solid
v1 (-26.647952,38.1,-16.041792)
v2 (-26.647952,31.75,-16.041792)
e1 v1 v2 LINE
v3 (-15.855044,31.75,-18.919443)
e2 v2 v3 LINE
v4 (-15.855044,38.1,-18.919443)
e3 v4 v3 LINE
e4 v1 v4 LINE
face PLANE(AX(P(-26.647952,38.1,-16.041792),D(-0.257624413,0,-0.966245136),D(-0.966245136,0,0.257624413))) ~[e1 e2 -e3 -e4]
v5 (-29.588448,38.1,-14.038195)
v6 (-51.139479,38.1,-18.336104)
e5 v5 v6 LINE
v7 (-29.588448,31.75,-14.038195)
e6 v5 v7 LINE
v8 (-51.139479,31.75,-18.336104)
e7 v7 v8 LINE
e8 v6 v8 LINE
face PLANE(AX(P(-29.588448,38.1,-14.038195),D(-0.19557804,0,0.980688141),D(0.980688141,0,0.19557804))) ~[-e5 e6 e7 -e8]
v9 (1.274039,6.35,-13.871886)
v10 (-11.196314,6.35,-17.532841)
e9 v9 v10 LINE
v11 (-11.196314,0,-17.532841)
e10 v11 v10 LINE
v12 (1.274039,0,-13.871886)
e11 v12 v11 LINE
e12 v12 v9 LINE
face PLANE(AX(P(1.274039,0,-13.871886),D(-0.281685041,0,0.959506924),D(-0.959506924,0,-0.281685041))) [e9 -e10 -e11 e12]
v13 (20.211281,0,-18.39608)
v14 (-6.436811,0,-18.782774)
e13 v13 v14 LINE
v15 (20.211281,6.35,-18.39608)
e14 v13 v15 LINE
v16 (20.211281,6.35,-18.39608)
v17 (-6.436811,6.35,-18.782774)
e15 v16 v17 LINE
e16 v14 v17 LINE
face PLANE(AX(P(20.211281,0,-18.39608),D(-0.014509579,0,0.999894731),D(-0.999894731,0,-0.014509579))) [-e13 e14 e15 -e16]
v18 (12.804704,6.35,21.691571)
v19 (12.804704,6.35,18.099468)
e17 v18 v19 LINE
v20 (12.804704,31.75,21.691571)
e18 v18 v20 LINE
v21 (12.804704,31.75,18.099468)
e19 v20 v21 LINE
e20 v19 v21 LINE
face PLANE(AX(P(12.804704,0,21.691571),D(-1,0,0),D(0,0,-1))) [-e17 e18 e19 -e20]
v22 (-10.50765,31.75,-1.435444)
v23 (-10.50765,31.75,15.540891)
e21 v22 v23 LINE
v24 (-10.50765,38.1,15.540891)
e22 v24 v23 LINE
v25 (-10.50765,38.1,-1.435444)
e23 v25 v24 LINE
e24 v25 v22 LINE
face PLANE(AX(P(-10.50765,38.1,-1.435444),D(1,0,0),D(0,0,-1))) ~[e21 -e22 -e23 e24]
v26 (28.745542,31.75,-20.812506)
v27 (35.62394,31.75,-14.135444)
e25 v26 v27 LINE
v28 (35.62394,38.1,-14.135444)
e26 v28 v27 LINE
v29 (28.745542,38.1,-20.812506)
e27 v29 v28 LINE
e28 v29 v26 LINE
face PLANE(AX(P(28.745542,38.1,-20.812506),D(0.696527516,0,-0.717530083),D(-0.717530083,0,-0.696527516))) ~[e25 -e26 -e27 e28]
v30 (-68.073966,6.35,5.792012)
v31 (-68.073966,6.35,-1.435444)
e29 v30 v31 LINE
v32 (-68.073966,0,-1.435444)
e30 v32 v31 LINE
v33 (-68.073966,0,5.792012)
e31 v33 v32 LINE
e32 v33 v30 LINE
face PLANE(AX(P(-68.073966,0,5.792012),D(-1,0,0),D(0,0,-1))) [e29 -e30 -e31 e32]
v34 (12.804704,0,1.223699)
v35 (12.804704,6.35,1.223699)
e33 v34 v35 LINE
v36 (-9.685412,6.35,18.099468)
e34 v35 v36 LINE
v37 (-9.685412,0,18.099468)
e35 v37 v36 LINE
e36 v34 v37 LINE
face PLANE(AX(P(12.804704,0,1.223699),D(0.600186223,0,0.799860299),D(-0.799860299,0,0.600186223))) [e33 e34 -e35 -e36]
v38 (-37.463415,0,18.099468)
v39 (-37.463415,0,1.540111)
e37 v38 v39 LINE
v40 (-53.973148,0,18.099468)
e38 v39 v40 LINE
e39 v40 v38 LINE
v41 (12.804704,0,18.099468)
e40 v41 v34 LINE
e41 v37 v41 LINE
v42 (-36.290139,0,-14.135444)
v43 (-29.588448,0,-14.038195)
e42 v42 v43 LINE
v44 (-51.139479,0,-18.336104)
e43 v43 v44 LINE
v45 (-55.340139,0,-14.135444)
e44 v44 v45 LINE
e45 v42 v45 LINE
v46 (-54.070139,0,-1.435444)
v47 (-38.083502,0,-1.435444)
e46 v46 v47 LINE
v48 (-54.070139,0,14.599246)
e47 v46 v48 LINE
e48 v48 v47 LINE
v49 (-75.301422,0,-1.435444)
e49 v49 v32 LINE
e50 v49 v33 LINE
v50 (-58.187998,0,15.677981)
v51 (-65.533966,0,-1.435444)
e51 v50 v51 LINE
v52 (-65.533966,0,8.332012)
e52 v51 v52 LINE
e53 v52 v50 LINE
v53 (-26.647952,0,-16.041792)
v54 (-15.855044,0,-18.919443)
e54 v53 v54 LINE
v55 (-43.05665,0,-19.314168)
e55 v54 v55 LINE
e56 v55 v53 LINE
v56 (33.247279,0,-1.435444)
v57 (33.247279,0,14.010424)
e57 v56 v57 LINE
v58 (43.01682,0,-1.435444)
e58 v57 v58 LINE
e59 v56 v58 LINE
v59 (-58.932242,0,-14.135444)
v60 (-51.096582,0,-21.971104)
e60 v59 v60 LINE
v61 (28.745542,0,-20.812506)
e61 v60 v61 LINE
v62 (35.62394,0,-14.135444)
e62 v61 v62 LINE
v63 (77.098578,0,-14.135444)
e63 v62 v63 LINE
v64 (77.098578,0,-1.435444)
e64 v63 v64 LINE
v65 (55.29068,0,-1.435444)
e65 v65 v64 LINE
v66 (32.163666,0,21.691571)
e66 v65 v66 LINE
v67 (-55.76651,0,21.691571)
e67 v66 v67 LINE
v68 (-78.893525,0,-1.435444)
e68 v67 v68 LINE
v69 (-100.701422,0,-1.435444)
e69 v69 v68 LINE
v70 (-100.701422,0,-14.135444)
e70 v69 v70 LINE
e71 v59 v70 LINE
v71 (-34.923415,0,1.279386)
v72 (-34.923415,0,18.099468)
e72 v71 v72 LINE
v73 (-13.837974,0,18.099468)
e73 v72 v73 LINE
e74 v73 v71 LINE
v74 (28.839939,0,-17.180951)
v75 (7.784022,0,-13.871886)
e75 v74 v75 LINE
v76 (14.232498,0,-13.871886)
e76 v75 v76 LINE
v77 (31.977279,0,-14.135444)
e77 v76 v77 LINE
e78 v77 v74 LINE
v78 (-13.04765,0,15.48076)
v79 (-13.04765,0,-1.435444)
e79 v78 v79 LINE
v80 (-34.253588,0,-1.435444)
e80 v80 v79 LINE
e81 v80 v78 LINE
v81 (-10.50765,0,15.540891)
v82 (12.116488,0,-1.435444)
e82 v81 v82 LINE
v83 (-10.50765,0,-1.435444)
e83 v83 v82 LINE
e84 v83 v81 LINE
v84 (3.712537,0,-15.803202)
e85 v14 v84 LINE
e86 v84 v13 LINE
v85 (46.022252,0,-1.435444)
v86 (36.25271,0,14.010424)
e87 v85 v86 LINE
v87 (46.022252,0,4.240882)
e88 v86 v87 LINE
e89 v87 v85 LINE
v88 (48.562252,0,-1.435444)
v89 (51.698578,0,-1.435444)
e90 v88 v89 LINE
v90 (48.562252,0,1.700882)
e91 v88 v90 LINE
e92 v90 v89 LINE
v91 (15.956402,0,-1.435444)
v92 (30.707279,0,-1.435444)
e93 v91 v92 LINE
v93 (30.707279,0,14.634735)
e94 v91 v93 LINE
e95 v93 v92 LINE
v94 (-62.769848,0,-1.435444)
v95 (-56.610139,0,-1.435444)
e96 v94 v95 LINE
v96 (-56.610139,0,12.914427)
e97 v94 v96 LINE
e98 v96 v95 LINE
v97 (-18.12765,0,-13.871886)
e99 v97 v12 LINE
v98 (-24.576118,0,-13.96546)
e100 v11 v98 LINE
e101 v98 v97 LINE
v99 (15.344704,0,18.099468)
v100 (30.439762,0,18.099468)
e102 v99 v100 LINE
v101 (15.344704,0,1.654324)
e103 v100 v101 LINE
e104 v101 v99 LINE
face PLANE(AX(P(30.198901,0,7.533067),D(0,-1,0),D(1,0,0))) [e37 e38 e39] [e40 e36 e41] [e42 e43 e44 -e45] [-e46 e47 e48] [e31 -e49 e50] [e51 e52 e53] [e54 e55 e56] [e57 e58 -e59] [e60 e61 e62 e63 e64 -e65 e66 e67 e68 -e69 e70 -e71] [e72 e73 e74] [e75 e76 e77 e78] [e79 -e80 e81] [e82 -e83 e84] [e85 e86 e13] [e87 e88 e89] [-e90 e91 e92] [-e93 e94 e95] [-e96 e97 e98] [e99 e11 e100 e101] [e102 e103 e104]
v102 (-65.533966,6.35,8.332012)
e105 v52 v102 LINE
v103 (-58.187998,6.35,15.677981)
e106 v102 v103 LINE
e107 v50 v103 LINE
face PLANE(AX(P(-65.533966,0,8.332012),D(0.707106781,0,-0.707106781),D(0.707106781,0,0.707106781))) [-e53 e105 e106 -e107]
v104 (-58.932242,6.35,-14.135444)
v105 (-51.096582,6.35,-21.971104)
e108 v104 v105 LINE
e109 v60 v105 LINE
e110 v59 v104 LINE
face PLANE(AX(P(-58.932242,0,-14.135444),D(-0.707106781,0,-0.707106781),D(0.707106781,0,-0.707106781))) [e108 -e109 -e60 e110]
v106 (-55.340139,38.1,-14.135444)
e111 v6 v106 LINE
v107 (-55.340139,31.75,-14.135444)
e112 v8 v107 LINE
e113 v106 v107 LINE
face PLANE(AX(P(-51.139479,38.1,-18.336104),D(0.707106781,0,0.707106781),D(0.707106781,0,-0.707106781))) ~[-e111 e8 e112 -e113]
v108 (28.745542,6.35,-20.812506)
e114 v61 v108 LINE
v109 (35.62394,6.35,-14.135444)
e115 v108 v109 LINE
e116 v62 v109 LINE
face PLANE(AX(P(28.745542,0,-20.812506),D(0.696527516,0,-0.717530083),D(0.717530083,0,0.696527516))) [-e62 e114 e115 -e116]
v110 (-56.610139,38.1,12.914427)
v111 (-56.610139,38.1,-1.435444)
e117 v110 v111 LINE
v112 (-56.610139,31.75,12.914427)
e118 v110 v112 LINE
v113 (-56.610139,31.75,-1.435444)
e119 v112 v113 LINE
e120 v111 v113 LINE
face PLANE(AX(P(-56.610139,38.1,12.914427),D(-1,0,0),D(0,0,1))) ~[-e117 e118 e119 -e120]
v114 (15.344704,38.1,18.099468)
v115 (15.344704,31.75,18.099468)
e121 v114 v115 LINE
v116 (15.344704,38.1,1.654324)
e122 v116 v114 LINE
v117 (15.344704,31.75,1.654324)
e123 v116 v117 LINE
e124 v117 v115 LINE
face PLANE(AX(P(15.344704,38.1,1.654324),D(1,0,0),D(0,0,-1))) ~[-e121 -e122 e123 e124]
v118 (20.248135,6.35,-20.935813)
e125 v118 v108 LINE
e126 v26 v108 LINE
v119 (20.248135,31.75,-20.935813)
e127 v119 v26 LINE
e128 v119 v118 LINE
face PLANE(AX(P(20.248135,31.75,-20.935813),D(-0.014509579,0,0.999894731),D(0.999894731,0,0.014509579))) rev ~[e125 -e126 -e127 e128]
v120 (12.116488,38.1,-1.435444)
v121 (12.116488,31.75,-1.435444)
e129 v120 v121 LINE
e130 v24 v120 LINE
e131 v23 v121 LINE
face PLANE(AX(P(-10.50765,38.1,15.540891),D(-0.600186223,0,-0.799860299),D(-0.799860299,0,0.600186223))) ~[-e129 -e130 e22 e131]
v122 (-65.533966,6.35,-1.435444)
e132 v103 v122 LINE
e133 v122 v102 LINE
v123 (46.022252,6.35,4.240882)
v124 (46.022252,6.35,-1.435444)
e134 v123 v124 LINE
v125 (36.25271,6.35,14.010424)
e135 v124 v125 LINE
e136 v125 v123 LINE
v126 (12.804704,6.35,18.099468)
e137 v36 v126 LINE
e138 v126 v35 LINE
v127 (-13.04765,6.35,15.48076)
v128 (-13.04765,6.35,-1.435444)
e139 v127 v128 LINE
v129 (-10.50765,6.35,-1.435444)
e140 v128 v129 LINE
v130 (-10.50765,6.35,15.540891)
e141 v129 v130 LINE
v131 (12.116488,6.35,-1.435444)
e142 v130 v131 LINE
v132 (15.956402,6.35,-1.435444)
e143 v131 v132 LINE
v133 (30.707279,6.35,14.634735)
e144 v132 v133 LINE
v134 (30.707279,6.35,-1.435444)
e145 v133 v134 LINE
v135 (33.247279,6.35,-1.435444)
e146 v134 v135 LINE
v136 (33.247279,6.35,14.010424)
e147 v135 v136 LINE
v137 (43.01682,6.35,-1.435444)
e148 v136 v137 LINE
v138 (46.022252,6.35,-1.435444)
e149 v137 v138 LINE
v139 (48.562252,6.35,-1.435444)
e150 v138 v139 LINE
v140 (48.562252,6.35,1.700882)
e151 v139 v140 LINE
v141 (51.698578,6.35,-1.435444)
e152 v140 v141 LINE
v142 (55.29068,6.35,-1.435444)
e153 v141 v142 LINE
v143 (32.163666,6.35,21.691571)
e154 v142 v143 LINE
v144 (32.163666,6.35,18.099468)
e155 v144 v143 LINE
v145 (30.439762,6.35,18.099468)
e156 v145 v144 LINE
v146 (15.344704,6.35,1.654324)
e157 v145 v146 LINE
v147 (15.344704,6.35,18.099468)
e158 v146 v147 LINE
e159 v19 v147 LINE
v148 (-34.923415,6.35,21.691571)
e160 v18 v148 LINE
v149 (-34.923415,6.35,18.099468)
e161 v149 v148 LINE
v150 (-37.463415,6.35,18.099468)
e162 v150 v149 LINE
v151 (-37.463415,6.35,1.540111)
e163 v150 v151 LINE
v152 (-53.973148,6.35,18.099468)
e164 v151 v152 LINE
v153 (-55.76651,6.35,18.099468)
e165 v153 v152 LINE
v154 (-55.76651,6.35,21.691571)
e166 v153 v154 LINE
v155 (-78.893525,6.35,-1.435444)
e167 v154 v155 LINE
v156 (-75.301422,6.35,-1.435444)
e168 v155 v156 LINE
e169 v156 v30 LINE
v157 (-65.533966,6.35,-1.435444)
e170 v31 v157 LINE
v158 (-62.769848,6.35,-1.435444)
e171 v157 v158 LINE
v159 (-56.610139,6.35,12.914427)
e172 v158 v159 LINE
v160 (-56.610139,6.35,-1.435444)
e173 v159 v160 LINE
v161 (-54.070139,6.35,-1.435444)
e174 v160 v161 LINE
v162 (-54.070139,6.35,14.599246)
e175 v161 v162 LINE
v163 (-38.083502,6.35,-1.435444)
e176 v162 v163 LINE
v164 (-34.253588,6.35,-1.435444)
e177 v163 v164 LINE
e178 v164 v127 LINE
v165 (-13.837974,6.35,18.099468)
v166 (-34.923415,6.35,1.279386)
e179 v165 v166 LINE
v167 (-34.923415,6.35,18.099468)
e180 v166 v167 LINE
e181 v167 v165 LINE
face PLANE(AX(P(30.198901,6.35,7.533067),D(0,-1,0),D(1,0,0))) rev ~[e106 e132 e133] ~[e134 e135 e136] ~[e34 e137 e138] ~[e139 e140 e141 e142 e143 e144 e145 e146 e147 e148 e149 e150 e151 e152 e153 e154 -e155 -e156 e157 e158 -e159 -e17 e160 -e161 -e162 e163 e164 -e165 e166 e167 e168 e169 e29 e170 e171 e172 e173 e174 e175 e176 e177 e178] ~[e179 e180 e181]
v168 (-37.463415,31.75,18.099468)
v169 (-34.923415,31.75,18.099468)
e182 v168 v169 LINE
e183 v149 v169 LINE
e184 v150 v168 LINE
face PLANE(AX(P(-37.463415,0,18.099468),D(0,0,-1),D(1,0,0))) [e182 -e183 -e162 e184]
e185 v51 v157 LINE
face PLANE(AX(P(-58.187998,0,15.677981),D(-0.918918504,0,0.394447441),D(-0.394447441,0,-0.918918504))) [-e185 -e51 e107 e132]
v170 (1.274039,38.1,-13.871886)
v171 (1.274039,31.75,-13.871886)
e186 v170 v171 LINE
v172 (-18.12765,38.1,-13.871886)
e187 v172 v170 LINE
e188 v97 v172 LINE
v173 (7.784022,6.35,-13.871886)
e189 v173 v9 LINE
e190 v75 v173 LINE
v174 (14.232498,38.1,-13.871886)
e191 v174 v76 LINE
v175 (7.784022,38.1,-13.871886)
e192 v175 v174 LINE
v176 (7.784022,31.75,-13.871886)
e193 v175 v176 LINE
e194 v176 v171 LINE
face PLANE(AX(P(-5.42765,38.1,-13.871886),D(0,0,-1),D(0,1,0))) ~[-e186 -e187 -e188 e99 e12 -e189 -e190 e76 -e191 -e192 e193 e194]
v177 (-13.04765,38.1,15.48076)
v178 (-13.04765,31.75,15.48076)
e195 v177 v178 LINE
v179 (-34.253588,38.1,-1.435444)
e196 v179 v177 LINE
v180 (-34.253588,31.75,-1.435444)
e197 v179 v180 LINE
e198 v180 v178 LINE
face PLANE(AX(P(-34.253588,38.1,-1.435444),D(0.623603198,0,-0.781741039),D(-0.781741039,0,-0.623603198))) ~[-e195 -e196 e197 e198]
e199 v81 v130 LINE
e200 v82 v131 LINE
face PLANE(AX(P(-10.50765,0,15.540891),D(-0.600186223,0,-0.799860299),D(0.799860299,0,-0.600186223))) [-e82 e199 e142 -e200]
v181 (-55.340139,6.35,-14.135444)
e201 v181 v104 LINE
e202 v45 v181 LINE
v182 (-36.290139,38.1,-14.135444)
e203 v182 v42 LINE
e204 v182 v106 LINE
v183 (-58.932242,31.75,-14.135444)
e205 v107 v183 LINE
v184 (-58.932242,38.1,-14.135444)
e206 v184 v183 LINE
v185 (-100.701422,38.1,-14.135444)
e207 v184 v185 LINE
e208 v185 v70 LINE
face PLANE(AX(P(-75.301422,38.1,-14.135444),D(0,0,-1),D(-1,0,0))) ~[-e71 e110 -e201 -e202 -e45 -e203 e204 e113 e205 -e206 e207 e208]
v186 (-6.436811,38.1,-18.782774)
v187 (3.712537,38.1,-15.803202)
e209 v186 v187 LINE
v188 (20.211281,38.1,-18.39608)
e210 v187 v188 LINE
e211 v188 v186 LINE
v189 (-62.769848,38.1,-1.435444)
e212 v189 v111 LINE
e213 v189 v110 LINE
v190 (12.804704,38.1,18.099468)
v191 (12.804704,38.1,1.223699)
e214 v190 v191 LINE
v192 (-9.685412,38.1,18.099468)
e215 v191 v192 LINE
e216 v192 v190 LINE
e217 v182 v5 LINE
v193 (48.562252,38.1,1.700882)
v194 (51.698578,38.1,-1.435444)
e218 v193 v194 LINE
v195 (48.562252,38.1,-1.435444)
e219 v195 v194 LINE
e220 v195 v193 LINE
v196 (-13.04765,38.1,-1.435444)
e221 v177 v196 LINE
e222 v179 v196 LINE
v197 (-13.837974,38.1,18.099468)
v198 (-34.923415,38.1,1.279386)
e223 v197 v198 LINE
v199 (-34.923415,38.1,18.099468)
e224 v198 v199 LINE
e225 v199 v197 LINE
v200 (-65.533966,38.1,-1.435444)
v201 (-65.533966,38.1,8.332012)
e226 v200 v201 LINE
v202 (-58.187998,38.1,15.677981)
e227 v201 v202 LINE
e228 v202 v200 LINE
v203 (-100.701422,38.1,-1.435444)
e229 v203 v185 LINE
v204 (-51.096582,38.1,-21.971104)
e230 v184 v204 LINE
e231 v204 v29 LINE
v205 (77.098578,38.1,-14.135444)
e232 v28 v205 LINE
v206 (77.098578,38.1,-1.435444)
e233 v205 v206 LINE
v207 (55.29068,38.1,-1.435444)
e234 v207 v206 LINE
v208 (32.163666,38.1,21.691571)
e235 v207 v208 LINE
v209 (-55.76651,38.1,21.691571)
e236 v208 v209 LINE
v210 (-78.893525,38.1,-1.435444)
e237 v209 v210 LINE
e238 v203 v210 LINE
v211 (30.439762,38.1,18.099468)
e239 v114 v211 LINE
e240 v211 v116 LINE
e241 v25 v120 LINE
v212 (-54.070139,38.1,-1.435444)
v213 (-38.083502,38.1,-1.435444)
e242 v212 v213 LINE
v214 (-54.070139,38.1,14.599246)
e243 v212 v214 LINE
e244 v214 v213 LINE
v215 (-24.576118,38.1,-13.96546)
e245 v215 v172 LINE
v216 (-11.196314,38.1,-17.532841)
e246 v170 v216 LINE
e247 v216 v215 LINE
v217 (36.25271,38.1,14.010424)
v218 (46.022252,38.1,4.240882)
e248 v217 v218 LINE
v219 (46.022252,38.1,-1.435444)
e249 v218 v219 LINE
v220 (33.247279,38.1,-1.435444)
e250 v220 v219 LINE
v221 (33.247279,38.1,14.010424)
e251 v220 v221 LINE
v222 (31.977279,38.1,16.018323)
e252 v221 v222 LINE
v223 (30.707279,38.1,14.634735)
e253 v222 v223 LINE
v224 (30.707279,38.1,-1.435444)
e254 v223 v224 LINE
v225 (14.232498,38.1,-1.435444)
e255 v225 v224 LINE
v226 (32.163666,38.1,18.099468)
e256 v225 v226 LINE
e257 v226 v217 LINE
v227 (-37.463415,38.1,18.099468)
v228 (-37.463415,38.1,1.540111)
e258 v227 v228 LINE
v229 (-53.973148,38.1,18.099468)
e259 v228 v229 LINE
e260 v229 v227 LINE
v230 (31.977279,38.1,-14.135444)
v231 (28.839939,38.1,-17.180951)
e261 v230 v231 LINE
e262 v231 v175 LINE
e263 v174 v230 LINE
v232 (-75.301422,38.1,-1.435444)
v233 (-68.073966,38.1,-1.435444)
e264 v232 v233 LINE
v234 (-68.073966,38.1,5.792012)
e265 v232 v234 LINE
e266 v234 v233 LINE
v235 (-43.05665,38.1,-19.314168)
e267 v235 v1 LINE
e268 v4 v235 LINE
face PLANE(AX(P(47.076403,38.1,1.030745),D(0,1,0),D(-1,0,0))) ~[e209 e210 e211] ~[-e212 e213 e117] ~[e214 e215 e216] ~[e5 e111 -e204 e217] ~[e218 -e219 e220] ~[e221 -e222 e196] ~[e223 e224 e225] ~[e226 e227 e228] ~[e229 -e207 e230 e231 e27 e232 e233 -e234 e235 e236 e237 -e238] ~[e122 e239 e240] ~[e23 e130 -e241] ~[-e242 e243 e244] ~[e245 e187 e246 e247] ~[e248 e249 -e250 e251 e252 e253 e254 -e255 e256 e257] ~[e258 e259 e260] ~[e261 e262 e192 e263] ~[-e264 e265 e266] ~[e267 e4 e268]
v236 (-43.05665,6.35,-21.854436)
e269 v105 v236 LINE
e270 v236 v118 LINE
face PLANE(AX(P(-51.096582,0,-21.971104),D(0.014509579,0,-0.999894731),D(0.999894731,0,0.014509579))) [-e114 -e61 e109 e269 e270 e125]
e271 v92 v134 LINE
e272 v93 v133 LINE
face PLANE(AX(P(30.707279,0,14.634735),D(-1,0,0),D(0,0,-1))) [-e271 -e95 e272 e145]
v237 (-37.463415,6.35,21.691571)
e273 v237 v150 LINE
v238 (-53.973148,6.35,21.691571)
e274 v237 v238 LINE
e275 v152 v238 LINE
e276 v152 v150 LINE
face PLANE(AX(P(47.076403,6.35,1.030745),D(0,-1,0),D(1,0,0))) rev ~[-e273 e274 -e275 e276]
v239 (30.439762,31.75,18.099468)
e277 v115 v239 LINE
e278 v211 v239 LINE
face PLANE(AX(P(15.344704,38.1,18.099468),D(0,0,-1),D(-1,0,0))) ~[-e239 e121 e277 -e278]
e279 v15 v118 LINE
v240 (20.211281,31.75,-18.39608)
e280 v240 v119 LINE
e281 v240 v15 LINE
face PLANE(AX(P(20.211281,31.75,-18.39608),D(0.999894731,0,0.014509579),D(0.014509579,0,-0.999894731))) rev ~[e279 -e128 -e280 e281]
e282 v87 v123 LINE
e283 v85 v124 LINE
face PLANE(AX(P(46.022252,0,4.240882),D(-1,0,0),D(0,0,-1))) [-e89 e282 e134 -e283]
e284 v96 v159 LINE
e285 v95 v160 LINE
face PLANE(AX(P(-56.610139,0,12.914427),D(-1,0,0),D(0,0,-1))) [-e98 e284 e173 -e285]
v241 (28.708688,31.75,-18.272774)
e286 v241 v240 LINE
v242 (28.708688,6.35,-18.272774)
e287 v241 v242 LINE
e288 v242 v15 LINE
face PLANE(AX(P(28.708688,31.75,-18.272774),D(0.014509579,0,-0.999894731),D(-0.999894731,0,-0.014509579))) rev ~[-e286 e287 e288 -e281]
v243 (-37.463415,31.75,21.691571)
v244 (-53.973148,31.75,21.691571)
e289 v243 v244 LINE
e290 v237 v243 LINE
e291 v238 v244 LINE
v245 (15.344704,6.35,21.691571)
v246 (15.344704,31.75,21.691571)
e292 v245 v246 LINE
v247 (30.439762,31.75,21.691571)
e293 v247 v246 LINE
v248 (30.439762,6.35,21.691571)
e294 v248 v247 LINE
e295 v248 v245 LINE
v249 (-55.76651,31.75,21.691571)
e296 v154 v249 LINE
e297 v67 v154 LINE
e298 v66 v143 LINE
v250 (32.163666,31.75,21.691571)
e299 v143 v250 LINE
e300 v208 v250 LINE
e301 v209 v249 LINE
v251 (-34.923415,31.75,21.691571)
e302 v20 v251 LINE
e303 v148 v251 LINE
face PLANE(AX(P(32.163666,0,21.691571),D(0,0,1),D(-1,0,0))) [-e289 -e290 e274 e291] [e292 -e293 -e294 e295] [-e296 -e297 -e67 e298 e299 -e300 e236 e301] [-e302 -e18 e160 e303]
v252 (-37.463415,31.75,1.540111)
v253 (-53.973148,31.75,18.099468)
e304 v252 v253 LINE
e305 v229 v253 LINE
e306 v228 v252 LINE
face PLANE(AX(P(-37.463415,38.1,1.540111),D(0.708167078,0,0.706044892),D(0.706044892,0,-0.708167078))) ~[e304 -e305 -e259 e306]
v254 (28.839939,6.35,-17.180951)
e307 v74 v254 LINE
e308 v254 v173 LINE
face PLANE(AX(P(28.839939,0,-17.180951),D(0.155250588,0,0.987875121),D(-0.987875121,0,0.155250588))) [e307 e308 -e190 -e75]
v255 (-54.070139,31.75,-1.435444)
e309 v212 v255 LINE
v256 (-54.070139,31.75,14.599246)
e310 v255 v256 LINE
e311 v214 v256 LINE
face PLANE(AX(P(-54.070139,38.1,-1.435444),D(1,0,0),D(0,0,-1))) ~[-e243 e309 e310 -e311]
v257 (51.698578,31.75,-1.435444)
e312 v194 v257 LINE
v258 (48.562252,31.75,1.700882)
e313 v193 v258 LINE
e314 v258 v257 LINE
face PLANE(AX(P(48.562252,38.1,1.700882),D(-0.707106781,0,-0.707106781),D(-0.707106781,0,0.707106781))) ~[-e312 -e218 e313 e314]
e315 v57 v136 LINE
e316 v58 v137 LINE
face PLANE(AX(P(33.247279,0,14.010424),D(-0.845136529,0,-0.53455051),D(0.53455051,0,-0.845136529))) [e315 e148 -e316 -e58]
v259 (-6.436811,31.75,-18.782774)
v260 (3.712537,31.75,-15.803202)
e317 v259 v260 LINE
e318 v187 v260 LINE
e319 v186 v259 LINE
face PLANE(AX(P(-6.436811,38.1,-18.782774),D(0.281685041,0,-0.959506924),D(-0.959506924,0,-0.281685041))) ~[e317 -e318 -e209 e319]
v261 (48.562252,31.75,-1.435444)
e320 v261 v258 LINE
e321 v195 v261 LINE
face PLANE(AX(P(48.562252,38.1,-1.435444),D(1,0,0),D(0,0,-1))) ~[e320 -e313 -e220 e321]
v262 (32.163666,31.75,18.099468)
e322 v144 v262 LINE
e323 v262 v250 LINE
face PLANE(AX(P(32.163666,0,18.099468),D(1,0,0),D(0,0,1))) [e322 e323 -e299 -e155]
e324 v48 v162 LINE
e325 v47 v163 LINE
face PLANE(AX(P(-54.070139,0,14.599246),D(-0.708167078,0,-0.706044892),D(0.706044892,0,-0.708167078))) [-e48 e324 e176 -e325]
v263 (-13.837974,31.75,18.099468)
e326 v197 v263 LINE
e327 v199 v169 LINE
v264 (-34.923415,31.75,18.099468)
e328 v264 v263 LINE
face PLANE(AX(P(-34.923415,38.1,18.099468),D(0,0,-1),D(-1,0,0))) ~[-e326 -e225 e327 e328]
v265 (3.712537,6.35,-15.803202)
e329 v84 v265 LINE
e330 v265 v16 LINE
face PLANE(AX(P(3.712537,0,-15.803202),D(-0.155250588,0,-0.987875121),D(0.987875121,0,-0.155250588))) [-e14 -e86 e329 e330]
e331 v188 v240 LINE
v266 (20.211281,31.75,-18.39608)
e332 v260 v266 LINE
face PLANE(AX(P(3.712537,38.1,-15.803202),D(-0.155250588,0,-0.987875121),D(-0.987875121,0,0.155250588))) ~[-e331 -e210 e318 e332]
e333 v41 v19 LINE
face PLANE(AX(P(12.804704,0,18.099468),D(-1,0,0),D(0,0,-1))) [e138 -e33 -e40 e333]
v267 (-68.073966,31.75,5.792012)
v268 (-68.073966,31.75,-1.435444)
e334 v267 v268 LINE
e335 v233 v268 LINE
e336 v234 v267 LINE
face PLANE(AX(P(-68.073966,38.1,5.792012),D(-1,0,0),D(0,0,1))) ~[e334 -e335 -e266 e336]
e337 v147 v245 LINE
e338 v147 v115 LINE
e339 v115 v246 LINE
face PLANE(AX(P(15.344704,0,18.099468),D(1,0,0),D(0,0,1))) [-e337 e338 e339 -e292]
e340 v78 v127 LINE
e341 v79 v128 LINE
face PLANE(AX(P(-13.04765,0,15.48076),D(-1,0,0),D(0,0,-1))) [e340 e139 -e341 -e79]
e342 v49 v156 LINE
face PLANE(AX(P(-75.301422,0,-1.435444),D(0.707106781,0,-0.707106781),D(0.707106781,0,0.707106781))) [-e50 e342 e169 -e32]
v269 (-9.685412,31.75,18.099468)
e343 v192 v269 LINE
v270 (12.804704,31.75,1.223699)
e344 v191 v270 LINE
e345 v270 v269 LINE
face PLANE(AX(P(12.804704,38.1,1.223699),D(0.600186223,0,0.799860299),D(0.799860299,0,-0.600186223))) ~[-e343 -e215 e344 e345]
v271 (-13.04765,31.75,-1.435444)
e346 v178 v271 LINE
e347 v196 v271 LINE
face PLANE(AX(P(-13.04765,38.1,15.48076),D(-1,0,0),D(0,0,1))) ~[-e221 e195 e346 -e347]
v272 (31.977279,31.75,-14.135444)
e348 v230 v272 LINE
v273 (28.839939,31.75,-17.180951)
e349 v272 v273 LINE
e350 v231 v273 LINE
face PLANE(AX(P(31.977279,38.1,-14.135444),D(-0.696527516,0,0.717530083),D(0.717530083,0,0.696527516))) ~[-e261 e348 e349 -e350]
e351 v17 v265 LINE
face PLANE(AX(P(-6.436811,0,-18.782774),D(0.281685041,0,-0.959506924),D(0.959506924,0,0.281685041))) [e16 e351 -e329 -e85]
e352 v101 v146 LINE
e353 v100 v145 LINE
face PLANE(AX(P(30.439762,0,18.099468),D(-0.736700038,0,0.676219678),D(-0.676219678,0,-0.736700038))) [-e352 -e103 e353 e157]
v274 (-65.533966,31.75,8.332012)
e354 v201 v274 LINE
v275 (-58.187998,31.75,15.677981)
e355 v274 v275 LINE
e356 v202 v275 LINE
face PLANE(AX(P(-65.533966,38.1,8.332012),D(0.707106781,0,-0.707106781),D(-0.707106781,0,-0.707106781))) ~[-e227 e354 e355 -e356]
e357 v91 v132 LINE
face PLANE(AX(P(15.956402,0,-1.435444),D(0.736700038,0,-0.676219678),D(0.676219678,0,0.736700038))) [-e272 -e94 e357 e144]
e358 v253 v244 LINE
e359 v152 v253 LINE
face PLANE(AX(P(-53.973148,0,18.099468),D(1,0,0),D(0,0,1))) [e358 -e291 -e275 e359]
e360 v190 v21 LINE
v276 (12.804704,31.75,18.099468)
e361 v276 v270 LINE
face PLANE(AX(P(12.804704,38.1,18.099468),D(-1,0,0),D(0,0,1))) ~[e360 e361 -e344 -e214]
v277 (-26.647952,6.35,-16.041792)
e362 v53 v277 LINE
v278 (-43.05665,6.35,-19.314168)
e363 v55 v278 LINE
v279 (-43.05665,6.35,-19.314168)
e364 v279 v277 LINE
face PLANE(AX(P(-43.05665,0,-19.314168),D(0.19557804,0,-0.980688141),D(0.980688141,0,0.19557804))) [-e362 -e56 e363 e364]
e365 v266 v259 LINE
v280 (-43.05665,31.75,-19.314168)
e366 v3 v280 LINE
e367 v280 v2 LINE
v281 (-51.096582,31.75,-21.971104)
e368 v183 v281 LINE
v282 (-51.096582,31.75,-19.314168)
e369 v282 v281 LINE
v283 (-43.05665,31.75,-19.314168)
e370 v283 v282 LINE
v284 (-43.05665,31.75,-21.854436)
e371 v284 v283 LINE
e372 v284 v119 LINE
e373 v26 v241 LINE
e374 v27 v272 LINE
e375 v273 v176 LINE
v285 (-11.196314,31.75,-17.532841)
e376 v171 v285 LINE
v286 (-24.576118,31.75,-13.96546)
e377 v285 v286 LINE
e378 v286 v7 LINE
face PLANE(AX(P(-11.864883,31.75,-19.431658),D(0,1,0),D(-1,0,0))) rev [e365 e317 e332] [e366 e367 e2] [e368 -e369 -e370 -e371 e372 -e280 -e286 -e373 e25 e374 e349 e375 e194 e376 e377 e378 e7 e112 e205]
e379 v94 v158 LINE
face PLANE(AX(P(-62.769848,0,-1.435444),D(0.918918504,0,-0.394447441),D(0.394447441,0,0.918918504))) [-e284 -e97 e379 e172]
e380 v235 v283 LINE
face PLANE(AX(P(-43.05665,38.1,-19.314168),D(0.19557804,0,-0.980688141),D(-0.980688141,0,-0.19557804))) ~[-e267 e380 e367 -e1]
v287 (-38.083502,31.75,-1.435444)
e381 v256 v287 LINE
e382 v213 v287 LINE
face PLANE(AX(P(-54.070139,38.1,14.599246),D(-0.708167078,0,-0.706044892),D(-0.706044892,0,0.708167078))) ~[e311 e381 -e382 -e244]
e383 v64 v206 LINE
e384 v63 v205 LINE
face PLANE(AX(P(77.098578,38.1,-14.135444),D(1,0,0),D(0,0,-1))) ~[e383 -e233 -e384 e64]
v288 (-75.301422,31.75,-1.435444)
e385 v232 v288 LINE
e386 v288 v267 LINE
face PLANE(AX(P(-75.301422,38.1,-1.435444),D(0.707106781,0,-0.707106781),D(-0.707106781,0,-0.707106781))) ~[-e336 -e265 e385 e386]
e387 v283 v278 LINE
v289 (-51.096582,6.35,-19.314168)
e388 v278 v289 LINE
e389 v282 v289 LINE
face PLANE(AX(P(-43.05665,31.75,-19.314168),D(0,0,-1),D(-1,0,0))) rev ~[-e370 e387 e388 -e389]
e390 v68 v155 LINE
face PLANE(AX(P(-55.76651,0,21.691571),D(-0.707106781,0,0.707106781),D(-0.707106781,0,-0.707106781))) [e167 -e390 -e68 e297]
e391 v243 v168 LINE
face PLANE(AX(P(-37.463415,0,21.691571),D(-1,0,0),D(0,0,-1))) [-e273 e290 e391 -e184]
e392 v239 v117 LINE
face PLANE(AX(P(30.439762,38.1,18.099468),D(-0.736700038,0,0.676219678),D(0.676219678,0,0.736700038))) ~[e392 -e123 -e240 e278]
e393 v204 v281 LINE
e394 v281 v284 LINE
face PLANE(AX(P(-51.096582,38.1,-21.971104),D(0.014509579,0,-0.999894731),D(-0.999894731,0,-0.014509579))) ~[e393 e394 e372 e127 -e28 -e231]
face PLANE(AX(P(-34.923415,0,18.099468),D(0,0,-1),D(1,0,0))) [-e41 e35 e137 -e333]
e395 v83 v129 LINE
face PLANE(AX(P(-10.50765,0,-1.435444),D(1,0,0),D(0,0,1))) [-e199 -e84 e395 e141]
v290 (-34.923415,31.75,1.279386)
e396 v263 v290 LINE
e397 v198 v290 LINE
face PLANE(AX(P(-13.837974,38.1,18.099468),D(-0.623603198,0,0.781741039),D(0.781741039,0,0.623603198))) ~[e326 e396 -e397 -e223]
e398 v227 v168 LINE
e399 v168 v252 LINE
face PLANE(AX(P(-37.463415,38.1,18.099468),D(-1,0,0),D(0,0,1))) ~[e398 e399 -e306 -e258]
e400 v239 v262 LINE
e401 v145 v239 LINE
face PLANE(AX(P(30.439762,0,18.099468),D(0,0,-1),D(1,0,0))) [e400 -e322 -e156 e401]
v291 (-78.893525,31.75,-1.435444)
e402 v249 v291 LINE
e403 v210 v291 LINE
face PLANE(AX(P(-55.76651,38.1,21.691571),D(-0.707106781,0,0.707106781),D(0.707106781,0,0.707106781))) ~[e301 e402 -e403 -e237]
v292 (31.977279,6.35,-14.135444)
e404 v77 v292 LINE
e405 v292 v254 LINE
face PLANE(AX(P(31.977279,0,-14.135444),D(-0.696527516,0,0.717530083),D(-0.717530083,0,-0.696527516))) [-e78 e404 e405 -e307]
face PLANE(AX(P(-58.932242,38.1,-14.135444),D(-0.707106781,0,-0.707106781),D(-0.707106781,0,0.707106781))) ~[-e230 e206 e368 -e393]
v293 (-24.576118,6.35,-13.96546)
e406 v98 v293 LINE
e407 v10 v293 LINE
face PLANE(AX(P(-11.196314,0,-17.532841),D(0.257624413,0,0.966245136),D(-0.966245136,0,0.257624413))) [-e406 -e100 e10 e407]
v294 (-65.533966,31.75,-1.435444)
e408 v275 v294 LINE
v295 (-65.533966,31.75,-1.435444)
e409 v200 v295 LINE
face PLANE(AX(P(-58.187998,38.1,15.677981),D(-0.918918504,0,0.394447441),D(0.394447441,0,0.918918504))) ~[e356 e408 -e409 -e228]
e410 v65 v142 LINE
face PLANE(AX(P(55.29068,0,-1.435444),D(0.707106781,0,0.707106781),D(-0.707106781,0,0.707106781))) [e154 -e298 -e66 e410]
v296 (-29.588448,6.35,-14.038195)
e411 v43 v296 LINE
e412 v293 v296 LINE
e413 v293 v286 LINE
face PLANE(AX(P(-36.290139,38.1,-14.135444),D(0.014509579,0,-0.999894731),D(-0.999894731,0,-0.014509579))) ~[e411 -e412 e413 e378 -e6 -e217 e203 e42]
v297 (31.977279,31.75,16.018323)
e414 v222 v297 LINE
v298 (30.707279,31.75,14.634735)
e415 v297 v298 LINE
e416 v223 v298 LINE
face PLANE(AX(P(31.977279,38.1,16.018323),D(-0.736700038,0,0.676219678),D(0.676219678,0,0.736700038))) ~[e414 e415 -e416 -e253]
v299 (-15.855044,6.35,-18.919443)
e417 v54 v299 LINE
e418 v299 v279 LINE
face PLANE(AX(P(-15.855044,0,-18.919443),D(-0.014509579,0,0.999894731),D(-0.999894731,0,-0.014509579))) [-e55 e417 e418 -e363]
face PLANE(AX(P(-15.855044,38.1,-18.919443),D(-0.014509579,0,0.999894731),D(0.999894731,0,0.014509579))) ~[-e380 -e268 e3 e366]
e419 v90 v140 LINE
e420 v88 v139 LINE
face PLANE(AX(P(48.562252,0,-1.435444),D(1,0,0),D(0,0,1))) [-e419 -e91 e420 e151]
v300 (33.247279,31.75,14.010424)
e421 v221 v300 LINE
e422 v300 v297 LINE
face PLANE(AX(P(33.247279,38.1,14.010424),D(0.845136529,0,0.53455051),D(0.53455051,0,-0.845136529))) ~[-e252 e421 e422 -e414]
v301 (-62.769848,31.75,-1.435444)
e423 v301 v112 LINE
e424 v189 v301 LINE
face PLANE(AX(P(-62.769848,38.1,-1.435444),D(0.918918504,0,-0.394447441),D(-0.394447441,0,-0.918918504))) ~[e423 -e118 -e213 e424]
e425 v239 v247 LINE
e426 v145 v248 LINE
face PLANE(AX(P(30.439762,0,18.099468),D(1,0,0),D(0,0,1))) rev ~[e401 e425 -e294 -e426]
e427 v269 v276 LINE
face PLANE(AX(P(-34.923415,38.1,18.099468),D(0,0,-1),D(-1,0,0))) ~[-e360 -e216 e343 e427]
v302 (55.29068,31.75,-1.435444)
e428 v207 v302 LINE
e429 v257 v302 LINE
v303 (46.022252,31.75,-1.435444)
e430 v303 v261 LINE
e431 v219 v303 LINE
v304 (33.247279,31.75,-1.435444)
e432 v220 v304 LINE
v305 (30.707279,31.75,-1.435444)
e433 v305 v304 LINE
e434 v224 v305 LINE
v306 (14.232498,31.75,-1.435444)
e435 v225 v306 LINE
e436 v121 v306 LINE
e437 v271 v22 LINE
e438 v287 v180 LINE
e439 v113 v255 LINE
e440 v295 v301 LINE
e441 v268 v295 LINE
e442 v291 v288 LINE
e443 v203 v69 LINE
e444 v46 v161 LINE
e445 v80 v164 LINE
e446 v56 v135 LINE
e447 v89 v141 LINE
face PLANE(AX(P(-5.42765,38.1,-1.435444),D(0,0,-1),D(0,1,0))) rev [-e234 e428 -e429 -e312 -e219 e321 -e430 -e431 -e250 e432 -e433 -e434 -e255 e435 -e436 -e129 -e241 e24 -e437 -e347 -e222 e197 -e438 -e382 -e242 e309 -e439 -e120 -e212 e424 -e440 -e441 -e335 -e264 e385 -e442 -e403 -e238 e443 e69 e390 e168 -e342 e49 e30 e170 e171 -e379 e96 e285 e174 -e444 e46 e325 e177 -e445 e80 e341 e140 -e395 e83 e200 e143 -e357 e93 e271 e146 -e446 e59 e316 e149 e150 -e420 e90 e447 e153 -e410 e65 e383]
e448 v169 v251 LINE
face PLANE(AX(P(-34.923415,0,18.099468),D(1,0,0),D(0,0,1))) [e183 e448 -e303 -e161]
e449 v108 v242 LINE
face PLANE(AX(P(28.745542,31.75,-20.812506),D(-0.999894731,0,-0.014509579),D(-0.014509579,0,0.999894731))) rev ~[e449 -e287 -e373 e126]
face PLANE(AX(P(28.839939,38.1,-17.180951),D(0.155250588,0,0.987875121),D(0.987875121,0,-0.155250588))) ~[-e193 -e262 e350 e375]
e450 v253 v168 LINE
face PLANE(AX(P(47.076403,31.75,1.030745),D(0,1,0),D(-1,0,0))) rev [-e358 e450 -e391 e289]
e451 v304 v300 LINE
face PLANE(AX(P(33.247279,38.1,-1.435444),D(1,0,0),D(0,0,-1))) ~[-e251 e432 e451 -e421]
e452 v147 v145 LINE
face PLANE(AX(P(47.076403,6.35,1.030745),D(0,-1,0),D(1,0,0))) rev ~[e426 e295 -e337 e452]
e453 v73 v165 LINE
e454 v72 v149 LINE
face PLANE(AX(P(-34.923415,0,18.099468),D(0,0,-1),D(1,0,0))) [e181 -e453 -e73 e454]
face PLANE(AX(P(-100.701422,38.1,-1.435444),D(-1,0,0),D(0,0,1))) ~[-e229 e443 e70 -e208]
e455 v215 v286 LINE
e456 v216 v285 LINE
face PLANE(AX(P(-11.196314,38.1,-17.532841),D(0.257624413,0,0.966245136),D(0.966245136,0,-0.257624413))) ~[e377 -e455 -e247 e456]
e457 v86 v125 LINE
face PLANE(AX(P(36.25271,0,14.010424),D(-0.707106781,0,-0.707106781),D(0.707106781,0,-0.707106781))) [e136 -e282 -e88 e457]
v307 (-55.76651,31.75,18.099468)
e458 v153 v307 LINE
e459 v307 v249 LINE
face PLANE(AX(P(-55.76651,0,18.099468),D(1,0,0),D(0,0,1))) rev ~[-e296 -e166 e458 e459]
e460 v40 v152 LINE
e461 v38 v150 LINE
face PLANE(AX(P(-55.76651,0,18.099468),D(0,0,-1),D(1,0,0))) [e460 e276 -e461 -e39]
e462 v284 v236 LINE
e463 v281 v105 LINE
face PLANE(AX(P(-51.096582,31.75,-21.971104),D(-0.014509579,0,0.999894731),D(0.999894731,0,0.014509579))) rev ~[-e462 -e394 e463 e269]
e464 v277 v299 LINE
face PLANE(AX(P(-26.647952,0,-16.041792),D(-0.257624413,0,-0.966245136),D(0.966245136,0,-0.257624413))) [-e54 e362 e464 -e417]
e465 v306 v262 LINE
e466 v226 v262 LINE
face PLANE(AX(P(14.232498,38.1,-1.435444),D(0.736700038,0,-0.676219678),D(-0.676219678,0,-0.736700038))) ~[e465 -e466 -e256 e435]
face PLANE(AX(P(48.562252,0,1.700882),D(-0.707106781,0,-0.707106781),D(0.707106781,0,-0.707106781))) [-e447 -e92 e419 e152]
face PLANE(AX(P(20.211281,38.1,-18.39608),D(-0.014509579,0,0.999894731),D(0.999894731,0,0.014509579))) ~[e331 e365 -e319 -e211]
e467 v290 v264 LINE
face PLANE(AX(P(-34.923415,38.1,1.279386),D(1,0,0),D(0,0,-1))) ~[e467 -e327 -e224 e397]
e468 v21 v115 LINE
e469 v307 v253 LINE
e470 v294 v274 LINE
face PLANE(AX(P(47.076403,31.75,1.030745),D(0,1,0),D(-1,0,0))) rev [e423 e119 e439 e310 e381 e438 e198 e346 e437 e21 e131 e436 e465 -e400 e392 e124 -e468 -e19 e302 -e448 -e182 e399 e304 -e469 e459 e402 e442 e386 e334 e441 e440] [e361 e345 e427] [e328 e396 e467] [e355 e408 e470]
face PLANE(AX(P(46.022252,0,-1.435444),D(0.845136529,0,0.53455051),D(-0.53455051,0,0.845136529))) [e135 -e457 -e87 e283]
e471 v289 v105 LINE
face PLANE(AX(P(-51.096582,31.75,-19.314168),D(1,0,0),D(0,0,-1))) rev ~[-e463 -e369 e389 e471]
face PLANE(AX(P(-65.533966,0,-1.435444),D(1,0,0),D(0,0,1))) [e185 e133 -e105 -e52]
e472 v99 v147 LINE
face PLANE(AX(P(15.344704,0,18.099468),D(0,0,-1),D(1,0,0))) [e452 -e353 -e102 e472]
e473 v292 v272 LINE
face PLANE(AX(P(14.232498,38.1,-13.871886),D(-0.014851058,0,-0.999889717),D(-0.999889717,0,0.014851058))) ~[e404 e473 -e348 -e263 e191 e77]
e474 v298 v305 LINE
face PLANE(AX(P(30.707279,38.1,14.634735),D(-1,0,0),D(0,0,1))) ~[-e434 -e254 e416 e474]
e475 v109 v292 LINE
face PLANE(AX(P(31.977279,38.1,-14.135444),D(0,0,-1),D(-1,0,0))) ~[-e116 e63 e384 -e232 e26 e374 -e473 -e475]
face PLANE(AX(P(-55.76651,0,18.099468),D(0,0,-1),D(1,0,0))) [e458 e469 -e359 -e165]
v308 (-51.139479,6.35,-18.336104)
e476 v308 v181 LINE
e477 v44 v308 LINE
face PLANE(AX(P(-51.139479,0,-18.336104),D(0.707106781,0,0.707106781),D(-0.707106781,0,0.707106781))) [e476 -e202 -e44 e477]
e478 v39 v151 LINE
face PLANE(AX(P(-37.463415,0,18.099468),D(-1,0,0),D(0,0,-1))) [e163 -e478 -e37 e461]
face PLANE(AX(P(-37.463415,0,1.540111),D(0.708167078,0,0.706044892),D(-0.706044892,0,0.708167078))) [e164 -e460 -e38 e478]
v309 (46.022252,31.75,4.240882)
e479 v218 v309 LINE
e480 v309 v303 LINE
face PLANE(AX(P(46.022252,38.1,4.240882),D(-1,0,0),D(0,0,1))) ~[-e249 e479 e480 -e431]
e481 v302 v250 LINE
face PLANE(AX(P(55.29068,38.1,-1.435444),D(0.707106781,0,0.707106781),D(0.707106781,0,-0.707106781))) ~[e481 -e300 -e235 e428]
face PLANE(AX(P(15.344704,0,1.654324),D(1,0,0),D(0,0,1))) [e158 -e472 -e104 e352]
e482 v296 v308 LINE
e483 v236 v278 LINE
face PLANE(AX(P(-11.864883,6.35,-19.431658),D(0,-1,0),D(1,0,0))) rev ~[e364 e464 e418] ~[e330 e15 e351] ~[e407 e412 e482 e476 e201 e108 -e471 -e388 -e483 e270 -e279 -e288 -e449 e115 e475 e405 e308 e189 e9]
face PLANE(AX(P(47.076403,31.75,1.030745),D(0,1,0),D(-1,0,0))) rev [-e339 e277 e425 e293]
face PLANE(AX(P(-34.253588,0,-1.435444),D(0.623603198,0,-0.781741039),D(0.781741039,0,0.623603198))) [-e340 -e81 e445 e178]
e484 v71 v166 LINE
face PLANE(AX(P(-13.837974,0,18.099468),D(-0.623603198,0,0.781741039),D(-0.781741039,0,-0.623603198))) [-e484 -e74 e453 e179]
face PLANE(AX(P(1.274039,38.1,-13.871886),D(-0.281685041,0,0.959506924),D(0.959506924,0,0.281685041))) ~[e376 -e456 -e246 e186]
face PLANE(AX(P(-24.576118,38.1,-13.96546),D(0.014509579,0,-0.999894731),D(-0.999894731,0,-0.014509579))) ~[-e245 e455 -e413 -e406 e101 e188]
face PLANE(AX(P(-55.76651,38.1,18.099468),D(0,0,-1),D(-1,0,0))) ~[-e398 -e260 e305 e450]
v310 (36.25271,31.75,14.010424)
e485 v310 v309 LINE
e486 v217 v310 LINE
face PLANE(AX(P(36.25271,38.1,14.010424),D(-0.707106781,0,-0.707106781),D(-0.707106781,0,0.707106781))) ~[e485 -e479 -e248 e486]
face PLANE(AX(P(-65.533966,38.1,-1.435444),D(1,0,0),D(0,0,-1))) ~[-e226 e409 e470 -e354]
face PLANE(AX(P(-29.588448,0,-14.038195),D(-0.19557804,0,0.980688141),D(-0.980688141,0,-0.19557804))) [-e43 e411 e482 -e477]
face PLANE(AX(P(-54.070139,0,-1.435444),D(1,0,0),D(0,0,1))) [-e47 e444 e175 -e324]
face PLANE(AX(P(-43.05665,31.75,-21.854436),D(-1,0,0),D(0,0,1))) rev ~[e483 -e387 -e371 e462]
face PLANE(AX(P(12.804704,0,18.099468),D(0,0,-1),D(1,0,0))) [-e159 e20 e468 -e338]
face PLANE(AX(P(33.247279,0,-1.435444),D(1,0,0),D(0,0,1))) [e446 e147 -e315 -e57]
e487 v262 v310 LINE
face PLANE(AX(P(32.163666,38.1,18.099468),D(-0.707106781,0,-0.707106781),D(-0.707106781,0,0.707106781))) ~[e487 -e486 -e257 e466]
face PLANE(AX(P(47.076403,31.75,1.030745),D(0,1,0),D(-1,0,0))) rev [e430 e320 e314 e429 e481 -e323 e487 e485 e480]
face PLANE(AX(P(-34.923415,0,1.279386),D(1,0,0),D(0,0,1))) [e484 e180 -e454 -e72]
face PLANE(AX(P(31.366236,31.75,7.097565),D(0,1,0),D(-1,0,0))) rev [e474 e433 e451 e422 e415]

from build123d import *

# Parameters (mm, degrees)
F1_DEPTH  = 19.05
F2_DEPTH  = 19.05
F3_DEPTH  = 12.7
F4_DEPTH  = 6.35
F5_DEPTH  = 6.35
F7_DEPTH  = 6.35
F8_DEPTH  = 6.35
F11_DEPTH = 25.4
F12_DEPTH = 25.4
F6_W      = 1.7239038059
F6_H      = 3.5921024484
F6_W_2    = 1.7933621035
F13_DEPTH = 38.1
F14_DEPTH = 6.35


# Not quite as in the source:
# - a feature names something its author has since deleted; it is built from what else it names


with BuildPart() as f1:
    # F0 (on Front) → F1 (new body)
    with BuildSketch(Plane.XZ):
        Polygon((-75.3014223417, -8.4543359262), (-75.3014223417, -1.435443759), (-78.8935247901, -1.435443759), (-100.7014223417, -1.435443759), (-100.7014223417, -14.135443759), (-75.3014223417, -14.135443759), align=None)
    extrude(amount=-F1_DEPTH)

    # F0 (on Front) → F2 (join)
    with BuildSketch(Plane.XZ):
        Polygon((-68.0739664064, -1.435443759), (-75.3014223417, -1.435443759), (-75.3014223417, -8.4543359262), (-75.3014223417, -14.135443759), (-58.9322418971, -14.135443759), (-55.3401394486, -14.135443759), (-55.3401394486, -1.435443759), (-56.6101394486, -1.435443759), (-62.7698475104, -1.435443759), (-64.1519069584, -1.435443759), (-65.5339664064, -1.435443759), align=None)
        Polygon((-55.3401394486, -1.435443759), (-55.3401394486, -14.135443759), (-36.2901394486, -14.135443759), (-36.2901394486, -1.435443759), (-38.0835015521, -1.435443759), (-54.0701394486, -1.435443759), align=None)
        Polygon((-34.2535879934, -1.435443759), (-36.2901394486, -1.435443759), (-36.2901394486, -14.135443759), (-29.5884479715, -14.0381948012), (-24.5761177188, -13.9654603438), (-18.1276498189, -13.8718859402), (-18.1276498189, -1.435443759), align=None)
    extrude(amount=-F2_DEPTH)



with BuildPart() as f1b:
    # F0 (on Front) → F1, piece 2 (new body)
    with BuildSketch(Plane.XZ):
        Polygon((77.0985776583, -1.435443759), (55.2906801068, -1.435443759), (51.6985776583, -1.435443759), (48.562251594, -1.435443759), (46.022251594, -1.435443759), (44.5195358117, -1.435443759), (43.0168200294, -1.435443759), (33.2472785554, -1.435443759), (31.9772785554, -1.435443759), (31.9772785554, -14.135443759), (35.6239399467, -14.135443759), (77.0985776583, -14.135443759), align=None)
    extrude(amount=-F1_DEPTH)

    # F0 (on Front) → F2, piece 2 (join)
    with BuildSketch(Plane.XZ):
        Polygon((14.2324982387, -13.8718859402), (14.2324982387, -1.435443759), (12.1164883202, -1.435443759), (-5.4276498189, -1.435443759), (-5.4276498189, -13.8718859402), (1.2740385811, -13.8718859402), (7.7840224387, -13.8718859402), align=None)
        Polygon((15.9564020446, -1.435443759), (14.2324982387, -1.435443759), (14.2324982387, -13.8718859402), (31.9772785554, -14.135443759), (31.9772785554, -1.435443759), (30.7072785554, -1.435443759), align=None)
        Polygon((77.0985776583, -1.435443759), (55.2906801068, -1.435443759), (51.6985776583, -1.435443759), (48.562251594, -1.435443759), (46.022251594, -1.435443759), (44.5195358117, -1.435443759), (43.0168200294, -1.435443759), (33.2472785554, -1.435443759), (31.9772785554, -1.435443759), (31.9772785554, -14.135443759), (35.6239399467, -14.135443759), (77.0985776583, -14.135443759), align=None)
    extrude(amount=-F2_DEPTH)


with BuildPart() as f1_1:
    add(f1.part)
    # F3 (add, through all): a face of the model
    f3_faces = [f1b.part.faces().sort_by_distance(p)[0] for p in [
        (-5.4276498189, 9.525, -7.6536648496),
    ]]

    add(f1b.part)  # F3 merges F1b
    extrude(f3_faces, amount=F3_DEPTH)

    # F0 (on Front) → F4 (join)
    with BuildSketch(Plane.XZ):
        Polygon((-78.8935247901, -1.435443759), (-75.3014223417, -1.435443759), (-68.0739664064, 5.7920121763), (-65.5339664064, 8.3320121763), (-58.1879977366, 15.6779808461), (-55.7665104711, 18.0994681116), (-53.9731483676, 18.0994681116), (-37.4634148507, 18.0994681116), (-36.1934148507, 18.0994681116), (-34.9234148507, 18.0994681116), (-13.8379737969, 18.0994681116), (-11.8014223417, 18.0994681116), (-9.6854124232, 18.0994681116), (12.8047038004, 18.0994681116), (14.0747038004, 18.0994681116), (15.3447038004, 18.0994681116), (30.4397619819, 18.0994681116), (32.1636657878, 18.0994681116), (36.2527101199, 14.0104237794), (46.022251594, 4.2408823054), (48.562251594, 1.7008823054), (51.6985776583, -1.435443759), (55.2906801068, -1.435443759), (32.1636657878, 21.69157056), (-55.7665104711, 21.69157056), align=None)
        Polygon((-68.0739664064, 5.7920121763), (-68.0739664064, -1.435443759), (-65.5339664064, -1.435443759), (-65.5339664064, 8.3320121763), align=None)
        Polygon((-36.1934148507, 18.0994681116), (-37.4634148507, 18.0994681116), (-37.4634148507, 1.5401106785), (-36.1934148507, 0.2662933926), align=None)
        Polygon((-34.9234148507, 18.0994681116), (-36.1934148507, 18.0994681116), (-36.1934148507, 0.2662933926), (-34.9234148507, 1.2793859922), align=None)
        Polygon((-11.7776498189, 16.4938528035), (-13.0476498189, 15.4807602039), (-13.0476498189, -1.435443759), (-11.7776498189, -1.435443759), align=None)
        Polygon((-10.5076498189, 15.5408907631), (-11.7776498189, 16.4938528035), (-11.7776498189, -1.435443759), (-10.5076498189, -1.435443759), align=None)
        Polygon((15.3447038004, 18.0994681116), (14.0747038004, 18.0994681116), (14.0747038004, 0.2707367444), (15.3447038004, 1.6543241772), align=None)
        Polygon((14.0747038004, 18.0994681116), (12.8047038004, 18.0994681116), (12.8047038004, 1.2236987848), (14.0747038004, 0.2707367444), align=None)
        Polygon((30.7072785554, -1.435443759), (31.9772785554, -1.435443759), (31.9772785554, 16.0183226994), (30.7072785554, 14.6347352666), align=None)
        Polygon((31.9772785554, 16.0183226994), (31.9772785554, -1.435443759), (33.2472785554, -1.435443759), (33.2472785554, 14.0104237794), align=None)
        Polygon((-55.3401394486, 15.8730630517), (-55.3401394486, -1.435443759), (-54.0701394486, -1.435443759), (-54.0701394486, 14.5992457658), align=None)
        Polygon((-56.6101394486, 12.9144267948), (-56.6101394486, -1.435443759), (-55.3401394486, -1.435443759), (-55.3401394486, 15.8730630517), align=None)
    extrude(amount=-F4_DEPTH)

    # F0 (on Front) → F5 (join)
    with BuildSketch(Plane.XZ):
        Polygon((-55.7665104711, 18.0994681116), (-64.1519069584, -1.435443759), (-62.7698475104, -1.435443759), (-56.6101394486, 12.9144267948), (-55.3401394486, 15.8730630517), (-54.0701394486, 14.5992457658), (-38.0835015521, -1.435443759), (-36.2901394486, -1.435443759), align=None)
        Polygon((-58.1879977366, 15.6779808461), (-65.5339664064, -1.435443759), (-64.1519069584, -1.435443759), (-55.7665104711, 18.0994681116), align=None)
        Polygon((-53.9731483676, 18.0994681116), (-55.7665104711, 18.0994681116), (-36.2901394486, -1.435443759), (-11.8014223417, 18.0994681116), (-13.8379737969, 18.0994681116), (-34.9234148507, 1.2793859922), (-36.1934148507, 0.2662933926), (-37.4634148507, 1.5401106785), align=None)
        Polygon((-11.8014223417, 18.0994681116), (-36.2901394486, -1.435443759), (-34.2535879934, -1.435443759), (-13.0476498189, 15.4807602039), (-11.7776498189, 16.4938528035), (-10.5076498189, 15.5408907631), (12.1164883202, -1.435443759), (14.2324982387, -1.435443759), align=None)
        Polygon((-9.6854124232, 18.0994681116), (-11.8014223417, 18.0994681116), (14.2324982387, -1.435443759), (32.1636657878, 18.0994681116), (30.4397619819, 18.0994681116), (15.3447038004, 1.6543241772), (14.0747038004, 0.2707367444), (12.8047038004, 1.2236987848), align=None)
    extrude(amount=-F5_DEPTH)

    # F0 (on Front) → F7 (join)
    with BuildSketch(Plane.XZ):
        Polygon((-55.3401394486, -14.135443759), (-58.9322418971, -14.135443759), (-51.0965817995, -21.9711038566), (28.7455422806, -20.8125063022), (35.6239399467, -14.135443759), (31.9772785554, -14.135443759), (28.8399389893, -17.1809513785), (27.7001179184, -18.2874091537), (20.2112810939, -18.3960804614), (-6.4368105921, -18.782773754), (-11.1798369081, -18.8516003134), (-15.855044379, -18.9194427462), (-43.0566496336, -19.3141681332), (-50.0597917346, -19.415791473), (-51.1394793261, -18.3361038815), align=None)
        Polygon((-26.606417659, -14.7384993405), (-50.0597917346, -19.415791473), (-43.0566496336, -19.3141681332), (-26.647951981, -16.0417915366), (-15.855044379, -18.9194427462), (-11.1798369081, -18.8516003134), align=None)
        Polygon((-29.5884479715, -14.0381948012), (-51.1394793261, -18.3361038815), (-50.0597917346, -19.415791473), (-26.606417659, -14.7384993405), (-11.1798369081, -18.8516003134), (3.6282092287, -14.5043621946), (27.7001179184, -18.2874091537), (28.8399389893, -17.1809513785), (7.7840224387, -13.8718859402), (1.2740385811, -13.8718859402), (-11.1963136804, -17.5328409511), (-24.5761177188, -13.9654603438), align=None)
        Polygon((3.6282092287, -14.5043621946), (-11.1798369081, -18.8516003134), (-6.4368105921, -18.782773754), (3.7125368777, -15.8032023917), (20.2112810939, -18.3960804614), (27.7001179184, -18.2874091537), align=None)
    extrude(amount=-F7_DEPTH)

    # F0 (on Front) → F8 (join)
    with BuildSketch(Plane.XZ):
        Polygon((46.022251594, -1.435443759), (48.562251594, -1.435443759), (48.562251594, 1.7008823054), (46.022251594, 4.2408823054), align=None)
    extrude(amount=-F8_DEPTH)

    # F9: F1 across face


with BuildPart() as f1_2:
    add(f1_1.part)
    add(f1_1.part.mirror(Plane(origin=(-11.8589412224, 19.05, -7.7486185811), x_dir=(-1, 0, 0), z_dir=(0, 1, 0))))

    # F10 (on face) → F11 (join, through all)
    with BuildSketch(Plane.XZ.offset(-31.75)):
        Polygon((20.248135424, -20.9358130769), (28.7455422806, -20.8125063022), (28.7086879505, -18.2727736867), (20.2112810939, -18.3960804614), align=None)
    extrude(amount=F11_DEPTH)

    # F10 (on face) → F12 (join, through all)
    with BuildSketch(Plane.XZ.offset(-31.75)):
        Polygon((-43.0566496336, -21.8544355458), (-43.0566496336, -19.3141681332), (-51.0965817995, -19.3141681332), (-51.0965817995, -19.325645402), (-51.0965817995, -21.9711038566), align=None)
    extrude(amount=F12_DEPTH)

    # F6 (on face) → F13 (join)
    with BuildSketch(Plane.XZ):
        Polygon((15.3447038004, 18.0994681116), (15.3447038004, 21.69157056), (12.8047038004, 21.69157056), (12.8047038004, 18.0994681116), (14.0747038004, 18.0994681116), align=None)
        with Locations((31.3017138849, 19.8955193358)):
            Rectangle(F6_W, F6_H)
        with Locations((-54.8698294194, 19.8955193358)):
            Rectangle(F6_W_2, F6_H)
        Polygon((-34.9234148507, 18.0994681116), (-34.9234148507, 21.69157056), (-37.4634148507, 21.69157056), (-37.4634148507, 18.0994681116), (-36.1934148507, 18.0994681116), align=None)
    extrude(amount=-F13_DEPTH)

    # F0 (on Front) → F14 (join)
    with BuildSketch(Plane.XZ):
        Polygon((32.1636657878, 18.0994681116), (14.2324982387, -1.435443759), (15.9564020446, -1.435443759), (30.7072785554, 14.6347352666), (31.9772785554, 16.0183226994), (33.2472785554, 14.0104237794), (43.0168200294, -1.435443759), (44.5195358117, -1.435443759), align=None)
        Polygon((44.5195358117, -1.435443759), (46.022251594, -1.435443759), (36.2527101199, 14.0104237794), (32.1636657878, 18.0994681116), align=None)
    extrude(amount=-F14_DEPTH)


solid = f1_2.part
